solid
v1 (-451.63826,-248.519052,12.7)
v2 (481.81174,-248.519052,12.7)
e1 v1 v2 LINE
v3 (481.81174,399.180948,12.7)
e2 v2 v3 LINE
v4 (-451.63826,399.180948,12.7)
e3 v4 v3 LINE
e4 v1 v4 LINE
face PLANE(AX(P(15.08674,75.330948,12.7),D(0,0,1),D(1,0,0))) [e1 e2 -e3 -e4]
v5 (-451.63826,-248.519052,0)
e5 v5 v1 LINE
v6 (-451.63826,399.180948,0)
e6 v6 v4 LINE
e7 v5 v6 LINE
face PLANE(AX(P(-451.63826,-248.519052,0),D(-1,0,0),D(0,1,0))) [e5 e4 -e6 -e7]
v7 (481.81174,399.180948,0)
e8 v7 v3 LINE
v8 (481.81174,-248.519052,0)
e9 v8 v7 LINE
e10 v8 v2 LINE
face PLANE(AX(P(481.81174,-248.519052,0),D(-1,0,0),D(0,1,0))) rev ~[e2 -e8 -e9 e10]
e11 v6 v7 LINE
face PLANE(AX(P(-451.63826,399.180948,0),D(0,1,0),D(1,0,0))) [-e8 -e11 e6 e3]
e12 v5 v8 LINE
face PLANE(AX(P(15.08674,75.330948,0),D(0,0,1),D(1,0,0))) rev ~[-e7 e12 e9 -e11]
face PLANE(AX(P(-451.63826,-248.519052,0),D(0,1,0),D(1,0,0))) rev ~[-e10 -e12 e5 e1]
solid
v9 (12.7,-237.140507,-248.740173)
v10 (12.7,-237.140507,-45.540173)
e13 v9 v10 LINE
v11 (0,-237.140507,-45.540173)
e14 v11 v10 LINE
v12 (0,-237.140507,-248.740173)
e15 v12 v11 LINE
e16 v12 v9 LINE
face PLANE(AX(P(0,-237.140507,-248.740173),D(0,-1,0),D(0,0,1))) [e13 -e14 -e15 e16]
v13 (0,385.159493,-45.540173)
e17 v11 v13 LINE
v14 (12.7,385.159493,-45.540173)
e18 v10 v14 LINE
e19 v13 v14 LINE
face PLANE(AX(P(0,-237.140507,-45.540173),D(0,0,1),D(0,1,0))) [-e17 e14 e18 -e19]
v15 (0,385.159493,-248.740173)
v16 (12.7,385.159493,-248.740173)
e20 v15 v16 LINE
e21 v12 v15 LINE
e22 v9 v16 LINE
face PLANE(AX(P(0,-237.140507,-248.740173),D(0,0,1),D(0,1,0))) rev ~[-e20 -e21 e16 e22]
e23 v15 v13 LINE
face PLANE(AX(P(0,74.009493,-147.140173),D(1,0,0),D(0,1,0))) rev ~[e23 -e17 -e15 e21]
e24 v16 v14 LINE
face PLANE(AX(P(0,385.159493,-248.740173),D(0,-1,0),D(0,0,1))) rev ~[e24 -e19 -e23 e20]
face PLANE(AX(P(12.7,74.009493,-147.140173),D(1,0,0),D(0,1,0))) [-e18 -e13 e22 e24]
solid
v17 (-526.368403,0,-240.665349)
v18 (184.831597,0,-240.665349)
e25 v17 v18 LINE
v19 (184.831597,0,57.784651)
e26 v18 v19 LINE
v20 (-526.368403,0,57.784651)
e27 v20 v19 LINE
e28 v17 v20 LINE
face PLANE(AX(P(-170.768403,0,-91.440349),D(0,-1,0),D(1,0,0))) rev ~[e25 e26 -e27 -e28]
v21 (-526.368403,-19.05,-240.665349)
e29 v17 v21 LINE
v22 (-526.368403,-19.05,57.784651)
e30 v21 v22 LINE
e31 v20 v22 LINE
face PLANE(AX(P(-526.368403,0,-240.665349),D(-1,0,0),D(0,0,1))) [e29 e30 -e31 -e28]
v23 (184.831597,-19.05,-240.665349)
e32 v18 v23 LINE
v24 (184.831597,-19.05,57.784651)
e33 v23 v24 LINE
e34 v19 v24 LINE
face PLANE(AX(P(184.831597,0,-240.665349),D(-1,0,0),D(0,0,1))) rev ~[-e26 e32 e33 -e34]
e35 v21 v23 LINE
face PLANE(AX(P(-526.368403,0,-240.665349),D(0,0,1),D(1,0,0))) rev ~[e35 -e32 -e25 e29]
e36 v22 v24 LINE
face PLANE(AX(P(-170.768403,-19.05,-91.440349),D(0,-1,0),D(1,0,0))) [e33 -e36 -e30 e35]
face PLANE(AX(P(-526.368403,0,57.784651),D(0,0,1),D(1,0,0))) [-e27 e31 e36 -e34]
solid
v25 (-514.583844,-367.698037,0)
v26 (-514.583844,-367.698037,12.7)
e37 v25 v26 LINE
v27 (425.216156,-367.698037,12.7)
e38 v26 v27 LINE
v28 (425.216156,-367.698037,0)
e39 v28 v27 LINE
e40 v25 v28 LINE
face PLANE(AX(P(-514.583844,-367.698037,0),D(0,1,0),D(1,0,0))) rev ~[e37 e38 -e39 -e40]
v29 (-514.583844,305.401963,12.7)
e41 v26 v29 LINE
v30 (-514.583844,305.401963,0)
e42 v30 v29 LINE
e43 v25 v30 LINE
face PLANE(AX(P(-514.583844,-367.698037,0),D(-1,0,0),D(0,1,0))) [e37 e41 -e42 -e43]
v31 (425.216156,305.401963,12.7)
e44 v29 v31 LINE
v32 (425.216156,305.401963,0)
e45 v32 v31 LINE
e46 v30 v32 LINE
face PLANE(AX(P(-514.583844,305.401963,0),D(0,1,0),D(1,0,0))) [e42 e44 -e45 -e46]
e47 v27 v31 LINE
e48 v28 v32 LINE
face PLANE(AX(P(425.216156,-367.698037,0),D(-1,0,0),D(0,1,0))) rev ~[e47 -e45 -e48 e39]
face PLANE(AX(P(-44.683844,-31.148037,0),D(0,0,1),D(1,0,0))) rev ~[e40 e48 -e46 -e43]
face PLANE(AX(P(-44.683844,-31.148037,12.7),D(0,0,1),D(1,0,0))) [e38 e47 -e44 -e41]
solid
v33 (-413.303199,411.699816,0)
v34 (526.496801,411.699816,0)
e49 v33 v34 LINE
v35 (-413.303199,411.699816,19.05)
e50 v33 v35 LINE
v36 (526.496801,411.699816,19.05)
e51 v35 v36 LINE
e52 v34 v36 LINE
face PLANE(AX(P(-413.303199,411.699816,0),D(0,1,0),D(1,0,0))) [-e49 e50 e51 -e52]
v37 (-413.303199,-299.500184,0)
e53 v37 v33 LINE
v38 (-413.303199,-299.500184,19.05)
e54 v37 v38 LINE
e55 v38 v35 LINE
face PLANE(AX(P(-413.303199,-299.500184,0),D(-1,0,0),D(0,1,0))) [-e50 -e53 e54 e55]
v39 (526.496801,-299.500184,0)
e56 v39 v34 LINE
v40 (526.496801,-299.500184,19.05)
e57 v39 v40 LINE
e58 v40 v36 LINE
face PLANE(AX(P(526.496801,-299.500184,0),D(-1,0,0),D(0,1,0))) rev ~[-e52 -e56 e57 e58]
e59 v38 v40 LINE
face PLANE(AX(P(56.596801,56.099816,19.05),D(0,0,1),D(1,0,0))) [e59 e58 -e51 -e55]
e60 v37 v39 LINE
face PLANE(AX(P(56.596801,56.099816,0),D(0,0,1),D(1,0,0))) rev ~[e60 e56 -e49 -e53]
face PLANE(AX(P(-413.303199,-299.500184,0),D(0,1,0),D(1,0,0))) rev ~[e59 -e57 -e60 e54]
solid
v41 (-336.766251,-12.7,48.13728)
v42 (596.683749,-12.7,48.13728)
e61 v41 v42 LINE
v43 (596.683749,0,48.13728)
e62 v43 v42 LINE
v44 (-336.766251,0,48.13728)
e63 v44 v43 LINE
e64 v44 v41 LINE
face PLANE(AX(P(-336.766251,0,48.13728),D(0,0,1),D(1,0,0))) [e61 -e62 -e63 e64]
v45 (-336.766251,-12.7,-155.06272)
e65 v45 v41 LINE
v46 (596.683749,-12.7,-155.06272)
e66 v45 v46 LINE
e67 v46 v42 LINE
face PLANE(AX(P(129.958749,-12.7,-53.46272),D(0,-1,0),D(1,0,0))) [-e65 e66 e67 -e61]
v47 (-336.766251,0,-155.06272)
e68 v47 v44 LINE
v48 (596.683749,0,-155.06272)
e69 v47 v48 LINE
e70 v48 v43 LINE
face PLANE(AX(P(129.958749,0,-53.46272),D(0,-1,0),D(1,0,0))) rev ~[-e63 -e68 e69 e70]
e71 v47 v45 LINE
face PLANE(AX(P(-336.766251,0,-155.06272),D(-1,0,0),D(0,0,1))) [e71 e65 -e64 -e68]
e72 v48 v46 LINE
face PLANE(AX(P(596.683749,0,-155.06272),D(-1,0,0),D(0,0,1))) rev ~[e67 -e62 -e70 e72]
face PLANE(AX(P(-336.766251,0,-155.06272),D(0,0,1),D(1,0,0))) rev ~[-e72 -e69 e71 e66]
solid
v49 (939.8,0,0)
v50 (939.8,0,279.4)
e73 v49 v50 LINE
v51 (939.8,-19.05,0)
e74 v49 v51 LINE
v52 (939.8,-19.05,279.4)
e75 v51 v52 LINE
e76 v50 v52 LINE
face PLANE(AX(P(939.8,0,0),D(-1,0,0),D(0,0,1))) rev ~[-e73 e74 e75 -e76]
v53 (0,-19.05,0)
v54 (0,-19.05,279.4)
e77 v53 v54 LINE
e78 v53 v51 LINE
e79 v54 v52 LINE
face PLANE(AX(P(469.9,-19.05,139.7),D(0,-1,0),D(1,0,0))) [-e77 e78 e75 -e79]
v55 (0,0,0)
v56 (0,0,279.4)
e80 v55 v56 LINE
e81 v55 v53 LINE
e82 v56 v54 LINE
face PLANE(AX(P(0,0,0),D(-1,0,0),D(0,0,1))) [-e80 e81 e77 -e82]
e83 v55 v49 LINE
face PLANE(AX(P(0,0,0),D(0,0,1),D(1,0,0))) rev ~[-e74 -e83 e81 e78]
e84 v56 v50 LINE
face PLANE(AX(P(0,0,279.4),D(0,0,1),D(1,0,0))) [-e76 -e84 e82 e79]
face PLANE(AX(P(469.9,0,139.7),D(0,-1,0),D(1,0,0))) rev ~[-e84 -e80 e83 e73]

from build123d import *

# Parameters (mm, degrees)
F0_W      = 939.8
F0_H      = 279.4
F1_DEPTH  = 19.05
F2_W      = 939.8
F2_H      = 711.2
F3_DEPTH  = 19.05
F4_W      = 939.8
F4_H      = 673.1
F5_DEPTH  = 12.7
F6_W      = 711.2
F6_H      = 298.45
F7_DEPTH  = 19.05
F8_W      = 933.45
F8_H      = 203.2
F9_DEPTH  = 12.7
F10_W     = 622.3
F10_H     = 203.2
F11_DEPTH = 12.7
F12_W     = 933.45
F12_H     = 647.7
F13_DEPTH = 12.7


# Not quite as in the source:
# - a length typed as a fraction of an inch, garbled in the dataset ("3 / 203.2 mm" for 3/8 in), is restored


with BuildPart() as f1:
    # F0 (on Front) → F1 (new body)
    with BuildSketch(Plane.XZ):
        with Locations((469.9, 139.7)):
            Rectangle(F0_W, F0_H)
    extrude(amount=F1_DEPTH)


with BuildPart() as f3:
    # F2 (on Top) → F3 (new body)
    with BuildSketch(Plane.XY):
        with Locations((56.5968006849, 56.099815594)):
            Rectangle(F2_W, F2_H)
    extrude(amount=F3_DEPTH)


with BuildPart() as f5:
    # F4 (on Top) → F5 (new body)
    with BuildSketch(Plane.XY):
        with Locations((-44.6838438511, -31.1480367078)):
            Rectangle(F4_W, F4_H)
    extrude(amount=F5_DEPTH)


with BuildPart() as f7:
    # F6 (on Front) → F7 (new body)
    with BuildSketch(Plane.XZ):
        with Locations((-170.7684025168, -91.4403489557)):
            Rectangle(F6_W, F6_H)
    extrude(amount=F7_DEPTH)


with BuildPart() as f9:
    # F8 (on Front) → F9 (new body)
    with BuildSketch(Plane.XZ):
        with Locations((129.9587488174, -53.4627198363)):
            Rectangle(F8_W, F8_H)
    extrude(amount=F9_DEPTH)


with BuildPart() as f11:
    # F10 (on Right) → F11 (new body)
    with BuildSketch(Plane.YZ):
        with Locations((74.0094929934, -147.1401725494)):
            Rectangle(F10_W, F10_H)
    extrude(amount=F11_DEPTH)


with BuildPart() as f13:
    # F12 (on Top) → F13 (new body)
    with BuildSketch(Plane.XY):
        with Locations((15.0867402554, 75.3309479109)):
            Rectangle(F12_W, F12_H)
    extrude(amount=F13_DEPTH)


solid = Compound([f1.part, f3.part, f5.part, f7.part, f9.part, f11.part, f13.part])
